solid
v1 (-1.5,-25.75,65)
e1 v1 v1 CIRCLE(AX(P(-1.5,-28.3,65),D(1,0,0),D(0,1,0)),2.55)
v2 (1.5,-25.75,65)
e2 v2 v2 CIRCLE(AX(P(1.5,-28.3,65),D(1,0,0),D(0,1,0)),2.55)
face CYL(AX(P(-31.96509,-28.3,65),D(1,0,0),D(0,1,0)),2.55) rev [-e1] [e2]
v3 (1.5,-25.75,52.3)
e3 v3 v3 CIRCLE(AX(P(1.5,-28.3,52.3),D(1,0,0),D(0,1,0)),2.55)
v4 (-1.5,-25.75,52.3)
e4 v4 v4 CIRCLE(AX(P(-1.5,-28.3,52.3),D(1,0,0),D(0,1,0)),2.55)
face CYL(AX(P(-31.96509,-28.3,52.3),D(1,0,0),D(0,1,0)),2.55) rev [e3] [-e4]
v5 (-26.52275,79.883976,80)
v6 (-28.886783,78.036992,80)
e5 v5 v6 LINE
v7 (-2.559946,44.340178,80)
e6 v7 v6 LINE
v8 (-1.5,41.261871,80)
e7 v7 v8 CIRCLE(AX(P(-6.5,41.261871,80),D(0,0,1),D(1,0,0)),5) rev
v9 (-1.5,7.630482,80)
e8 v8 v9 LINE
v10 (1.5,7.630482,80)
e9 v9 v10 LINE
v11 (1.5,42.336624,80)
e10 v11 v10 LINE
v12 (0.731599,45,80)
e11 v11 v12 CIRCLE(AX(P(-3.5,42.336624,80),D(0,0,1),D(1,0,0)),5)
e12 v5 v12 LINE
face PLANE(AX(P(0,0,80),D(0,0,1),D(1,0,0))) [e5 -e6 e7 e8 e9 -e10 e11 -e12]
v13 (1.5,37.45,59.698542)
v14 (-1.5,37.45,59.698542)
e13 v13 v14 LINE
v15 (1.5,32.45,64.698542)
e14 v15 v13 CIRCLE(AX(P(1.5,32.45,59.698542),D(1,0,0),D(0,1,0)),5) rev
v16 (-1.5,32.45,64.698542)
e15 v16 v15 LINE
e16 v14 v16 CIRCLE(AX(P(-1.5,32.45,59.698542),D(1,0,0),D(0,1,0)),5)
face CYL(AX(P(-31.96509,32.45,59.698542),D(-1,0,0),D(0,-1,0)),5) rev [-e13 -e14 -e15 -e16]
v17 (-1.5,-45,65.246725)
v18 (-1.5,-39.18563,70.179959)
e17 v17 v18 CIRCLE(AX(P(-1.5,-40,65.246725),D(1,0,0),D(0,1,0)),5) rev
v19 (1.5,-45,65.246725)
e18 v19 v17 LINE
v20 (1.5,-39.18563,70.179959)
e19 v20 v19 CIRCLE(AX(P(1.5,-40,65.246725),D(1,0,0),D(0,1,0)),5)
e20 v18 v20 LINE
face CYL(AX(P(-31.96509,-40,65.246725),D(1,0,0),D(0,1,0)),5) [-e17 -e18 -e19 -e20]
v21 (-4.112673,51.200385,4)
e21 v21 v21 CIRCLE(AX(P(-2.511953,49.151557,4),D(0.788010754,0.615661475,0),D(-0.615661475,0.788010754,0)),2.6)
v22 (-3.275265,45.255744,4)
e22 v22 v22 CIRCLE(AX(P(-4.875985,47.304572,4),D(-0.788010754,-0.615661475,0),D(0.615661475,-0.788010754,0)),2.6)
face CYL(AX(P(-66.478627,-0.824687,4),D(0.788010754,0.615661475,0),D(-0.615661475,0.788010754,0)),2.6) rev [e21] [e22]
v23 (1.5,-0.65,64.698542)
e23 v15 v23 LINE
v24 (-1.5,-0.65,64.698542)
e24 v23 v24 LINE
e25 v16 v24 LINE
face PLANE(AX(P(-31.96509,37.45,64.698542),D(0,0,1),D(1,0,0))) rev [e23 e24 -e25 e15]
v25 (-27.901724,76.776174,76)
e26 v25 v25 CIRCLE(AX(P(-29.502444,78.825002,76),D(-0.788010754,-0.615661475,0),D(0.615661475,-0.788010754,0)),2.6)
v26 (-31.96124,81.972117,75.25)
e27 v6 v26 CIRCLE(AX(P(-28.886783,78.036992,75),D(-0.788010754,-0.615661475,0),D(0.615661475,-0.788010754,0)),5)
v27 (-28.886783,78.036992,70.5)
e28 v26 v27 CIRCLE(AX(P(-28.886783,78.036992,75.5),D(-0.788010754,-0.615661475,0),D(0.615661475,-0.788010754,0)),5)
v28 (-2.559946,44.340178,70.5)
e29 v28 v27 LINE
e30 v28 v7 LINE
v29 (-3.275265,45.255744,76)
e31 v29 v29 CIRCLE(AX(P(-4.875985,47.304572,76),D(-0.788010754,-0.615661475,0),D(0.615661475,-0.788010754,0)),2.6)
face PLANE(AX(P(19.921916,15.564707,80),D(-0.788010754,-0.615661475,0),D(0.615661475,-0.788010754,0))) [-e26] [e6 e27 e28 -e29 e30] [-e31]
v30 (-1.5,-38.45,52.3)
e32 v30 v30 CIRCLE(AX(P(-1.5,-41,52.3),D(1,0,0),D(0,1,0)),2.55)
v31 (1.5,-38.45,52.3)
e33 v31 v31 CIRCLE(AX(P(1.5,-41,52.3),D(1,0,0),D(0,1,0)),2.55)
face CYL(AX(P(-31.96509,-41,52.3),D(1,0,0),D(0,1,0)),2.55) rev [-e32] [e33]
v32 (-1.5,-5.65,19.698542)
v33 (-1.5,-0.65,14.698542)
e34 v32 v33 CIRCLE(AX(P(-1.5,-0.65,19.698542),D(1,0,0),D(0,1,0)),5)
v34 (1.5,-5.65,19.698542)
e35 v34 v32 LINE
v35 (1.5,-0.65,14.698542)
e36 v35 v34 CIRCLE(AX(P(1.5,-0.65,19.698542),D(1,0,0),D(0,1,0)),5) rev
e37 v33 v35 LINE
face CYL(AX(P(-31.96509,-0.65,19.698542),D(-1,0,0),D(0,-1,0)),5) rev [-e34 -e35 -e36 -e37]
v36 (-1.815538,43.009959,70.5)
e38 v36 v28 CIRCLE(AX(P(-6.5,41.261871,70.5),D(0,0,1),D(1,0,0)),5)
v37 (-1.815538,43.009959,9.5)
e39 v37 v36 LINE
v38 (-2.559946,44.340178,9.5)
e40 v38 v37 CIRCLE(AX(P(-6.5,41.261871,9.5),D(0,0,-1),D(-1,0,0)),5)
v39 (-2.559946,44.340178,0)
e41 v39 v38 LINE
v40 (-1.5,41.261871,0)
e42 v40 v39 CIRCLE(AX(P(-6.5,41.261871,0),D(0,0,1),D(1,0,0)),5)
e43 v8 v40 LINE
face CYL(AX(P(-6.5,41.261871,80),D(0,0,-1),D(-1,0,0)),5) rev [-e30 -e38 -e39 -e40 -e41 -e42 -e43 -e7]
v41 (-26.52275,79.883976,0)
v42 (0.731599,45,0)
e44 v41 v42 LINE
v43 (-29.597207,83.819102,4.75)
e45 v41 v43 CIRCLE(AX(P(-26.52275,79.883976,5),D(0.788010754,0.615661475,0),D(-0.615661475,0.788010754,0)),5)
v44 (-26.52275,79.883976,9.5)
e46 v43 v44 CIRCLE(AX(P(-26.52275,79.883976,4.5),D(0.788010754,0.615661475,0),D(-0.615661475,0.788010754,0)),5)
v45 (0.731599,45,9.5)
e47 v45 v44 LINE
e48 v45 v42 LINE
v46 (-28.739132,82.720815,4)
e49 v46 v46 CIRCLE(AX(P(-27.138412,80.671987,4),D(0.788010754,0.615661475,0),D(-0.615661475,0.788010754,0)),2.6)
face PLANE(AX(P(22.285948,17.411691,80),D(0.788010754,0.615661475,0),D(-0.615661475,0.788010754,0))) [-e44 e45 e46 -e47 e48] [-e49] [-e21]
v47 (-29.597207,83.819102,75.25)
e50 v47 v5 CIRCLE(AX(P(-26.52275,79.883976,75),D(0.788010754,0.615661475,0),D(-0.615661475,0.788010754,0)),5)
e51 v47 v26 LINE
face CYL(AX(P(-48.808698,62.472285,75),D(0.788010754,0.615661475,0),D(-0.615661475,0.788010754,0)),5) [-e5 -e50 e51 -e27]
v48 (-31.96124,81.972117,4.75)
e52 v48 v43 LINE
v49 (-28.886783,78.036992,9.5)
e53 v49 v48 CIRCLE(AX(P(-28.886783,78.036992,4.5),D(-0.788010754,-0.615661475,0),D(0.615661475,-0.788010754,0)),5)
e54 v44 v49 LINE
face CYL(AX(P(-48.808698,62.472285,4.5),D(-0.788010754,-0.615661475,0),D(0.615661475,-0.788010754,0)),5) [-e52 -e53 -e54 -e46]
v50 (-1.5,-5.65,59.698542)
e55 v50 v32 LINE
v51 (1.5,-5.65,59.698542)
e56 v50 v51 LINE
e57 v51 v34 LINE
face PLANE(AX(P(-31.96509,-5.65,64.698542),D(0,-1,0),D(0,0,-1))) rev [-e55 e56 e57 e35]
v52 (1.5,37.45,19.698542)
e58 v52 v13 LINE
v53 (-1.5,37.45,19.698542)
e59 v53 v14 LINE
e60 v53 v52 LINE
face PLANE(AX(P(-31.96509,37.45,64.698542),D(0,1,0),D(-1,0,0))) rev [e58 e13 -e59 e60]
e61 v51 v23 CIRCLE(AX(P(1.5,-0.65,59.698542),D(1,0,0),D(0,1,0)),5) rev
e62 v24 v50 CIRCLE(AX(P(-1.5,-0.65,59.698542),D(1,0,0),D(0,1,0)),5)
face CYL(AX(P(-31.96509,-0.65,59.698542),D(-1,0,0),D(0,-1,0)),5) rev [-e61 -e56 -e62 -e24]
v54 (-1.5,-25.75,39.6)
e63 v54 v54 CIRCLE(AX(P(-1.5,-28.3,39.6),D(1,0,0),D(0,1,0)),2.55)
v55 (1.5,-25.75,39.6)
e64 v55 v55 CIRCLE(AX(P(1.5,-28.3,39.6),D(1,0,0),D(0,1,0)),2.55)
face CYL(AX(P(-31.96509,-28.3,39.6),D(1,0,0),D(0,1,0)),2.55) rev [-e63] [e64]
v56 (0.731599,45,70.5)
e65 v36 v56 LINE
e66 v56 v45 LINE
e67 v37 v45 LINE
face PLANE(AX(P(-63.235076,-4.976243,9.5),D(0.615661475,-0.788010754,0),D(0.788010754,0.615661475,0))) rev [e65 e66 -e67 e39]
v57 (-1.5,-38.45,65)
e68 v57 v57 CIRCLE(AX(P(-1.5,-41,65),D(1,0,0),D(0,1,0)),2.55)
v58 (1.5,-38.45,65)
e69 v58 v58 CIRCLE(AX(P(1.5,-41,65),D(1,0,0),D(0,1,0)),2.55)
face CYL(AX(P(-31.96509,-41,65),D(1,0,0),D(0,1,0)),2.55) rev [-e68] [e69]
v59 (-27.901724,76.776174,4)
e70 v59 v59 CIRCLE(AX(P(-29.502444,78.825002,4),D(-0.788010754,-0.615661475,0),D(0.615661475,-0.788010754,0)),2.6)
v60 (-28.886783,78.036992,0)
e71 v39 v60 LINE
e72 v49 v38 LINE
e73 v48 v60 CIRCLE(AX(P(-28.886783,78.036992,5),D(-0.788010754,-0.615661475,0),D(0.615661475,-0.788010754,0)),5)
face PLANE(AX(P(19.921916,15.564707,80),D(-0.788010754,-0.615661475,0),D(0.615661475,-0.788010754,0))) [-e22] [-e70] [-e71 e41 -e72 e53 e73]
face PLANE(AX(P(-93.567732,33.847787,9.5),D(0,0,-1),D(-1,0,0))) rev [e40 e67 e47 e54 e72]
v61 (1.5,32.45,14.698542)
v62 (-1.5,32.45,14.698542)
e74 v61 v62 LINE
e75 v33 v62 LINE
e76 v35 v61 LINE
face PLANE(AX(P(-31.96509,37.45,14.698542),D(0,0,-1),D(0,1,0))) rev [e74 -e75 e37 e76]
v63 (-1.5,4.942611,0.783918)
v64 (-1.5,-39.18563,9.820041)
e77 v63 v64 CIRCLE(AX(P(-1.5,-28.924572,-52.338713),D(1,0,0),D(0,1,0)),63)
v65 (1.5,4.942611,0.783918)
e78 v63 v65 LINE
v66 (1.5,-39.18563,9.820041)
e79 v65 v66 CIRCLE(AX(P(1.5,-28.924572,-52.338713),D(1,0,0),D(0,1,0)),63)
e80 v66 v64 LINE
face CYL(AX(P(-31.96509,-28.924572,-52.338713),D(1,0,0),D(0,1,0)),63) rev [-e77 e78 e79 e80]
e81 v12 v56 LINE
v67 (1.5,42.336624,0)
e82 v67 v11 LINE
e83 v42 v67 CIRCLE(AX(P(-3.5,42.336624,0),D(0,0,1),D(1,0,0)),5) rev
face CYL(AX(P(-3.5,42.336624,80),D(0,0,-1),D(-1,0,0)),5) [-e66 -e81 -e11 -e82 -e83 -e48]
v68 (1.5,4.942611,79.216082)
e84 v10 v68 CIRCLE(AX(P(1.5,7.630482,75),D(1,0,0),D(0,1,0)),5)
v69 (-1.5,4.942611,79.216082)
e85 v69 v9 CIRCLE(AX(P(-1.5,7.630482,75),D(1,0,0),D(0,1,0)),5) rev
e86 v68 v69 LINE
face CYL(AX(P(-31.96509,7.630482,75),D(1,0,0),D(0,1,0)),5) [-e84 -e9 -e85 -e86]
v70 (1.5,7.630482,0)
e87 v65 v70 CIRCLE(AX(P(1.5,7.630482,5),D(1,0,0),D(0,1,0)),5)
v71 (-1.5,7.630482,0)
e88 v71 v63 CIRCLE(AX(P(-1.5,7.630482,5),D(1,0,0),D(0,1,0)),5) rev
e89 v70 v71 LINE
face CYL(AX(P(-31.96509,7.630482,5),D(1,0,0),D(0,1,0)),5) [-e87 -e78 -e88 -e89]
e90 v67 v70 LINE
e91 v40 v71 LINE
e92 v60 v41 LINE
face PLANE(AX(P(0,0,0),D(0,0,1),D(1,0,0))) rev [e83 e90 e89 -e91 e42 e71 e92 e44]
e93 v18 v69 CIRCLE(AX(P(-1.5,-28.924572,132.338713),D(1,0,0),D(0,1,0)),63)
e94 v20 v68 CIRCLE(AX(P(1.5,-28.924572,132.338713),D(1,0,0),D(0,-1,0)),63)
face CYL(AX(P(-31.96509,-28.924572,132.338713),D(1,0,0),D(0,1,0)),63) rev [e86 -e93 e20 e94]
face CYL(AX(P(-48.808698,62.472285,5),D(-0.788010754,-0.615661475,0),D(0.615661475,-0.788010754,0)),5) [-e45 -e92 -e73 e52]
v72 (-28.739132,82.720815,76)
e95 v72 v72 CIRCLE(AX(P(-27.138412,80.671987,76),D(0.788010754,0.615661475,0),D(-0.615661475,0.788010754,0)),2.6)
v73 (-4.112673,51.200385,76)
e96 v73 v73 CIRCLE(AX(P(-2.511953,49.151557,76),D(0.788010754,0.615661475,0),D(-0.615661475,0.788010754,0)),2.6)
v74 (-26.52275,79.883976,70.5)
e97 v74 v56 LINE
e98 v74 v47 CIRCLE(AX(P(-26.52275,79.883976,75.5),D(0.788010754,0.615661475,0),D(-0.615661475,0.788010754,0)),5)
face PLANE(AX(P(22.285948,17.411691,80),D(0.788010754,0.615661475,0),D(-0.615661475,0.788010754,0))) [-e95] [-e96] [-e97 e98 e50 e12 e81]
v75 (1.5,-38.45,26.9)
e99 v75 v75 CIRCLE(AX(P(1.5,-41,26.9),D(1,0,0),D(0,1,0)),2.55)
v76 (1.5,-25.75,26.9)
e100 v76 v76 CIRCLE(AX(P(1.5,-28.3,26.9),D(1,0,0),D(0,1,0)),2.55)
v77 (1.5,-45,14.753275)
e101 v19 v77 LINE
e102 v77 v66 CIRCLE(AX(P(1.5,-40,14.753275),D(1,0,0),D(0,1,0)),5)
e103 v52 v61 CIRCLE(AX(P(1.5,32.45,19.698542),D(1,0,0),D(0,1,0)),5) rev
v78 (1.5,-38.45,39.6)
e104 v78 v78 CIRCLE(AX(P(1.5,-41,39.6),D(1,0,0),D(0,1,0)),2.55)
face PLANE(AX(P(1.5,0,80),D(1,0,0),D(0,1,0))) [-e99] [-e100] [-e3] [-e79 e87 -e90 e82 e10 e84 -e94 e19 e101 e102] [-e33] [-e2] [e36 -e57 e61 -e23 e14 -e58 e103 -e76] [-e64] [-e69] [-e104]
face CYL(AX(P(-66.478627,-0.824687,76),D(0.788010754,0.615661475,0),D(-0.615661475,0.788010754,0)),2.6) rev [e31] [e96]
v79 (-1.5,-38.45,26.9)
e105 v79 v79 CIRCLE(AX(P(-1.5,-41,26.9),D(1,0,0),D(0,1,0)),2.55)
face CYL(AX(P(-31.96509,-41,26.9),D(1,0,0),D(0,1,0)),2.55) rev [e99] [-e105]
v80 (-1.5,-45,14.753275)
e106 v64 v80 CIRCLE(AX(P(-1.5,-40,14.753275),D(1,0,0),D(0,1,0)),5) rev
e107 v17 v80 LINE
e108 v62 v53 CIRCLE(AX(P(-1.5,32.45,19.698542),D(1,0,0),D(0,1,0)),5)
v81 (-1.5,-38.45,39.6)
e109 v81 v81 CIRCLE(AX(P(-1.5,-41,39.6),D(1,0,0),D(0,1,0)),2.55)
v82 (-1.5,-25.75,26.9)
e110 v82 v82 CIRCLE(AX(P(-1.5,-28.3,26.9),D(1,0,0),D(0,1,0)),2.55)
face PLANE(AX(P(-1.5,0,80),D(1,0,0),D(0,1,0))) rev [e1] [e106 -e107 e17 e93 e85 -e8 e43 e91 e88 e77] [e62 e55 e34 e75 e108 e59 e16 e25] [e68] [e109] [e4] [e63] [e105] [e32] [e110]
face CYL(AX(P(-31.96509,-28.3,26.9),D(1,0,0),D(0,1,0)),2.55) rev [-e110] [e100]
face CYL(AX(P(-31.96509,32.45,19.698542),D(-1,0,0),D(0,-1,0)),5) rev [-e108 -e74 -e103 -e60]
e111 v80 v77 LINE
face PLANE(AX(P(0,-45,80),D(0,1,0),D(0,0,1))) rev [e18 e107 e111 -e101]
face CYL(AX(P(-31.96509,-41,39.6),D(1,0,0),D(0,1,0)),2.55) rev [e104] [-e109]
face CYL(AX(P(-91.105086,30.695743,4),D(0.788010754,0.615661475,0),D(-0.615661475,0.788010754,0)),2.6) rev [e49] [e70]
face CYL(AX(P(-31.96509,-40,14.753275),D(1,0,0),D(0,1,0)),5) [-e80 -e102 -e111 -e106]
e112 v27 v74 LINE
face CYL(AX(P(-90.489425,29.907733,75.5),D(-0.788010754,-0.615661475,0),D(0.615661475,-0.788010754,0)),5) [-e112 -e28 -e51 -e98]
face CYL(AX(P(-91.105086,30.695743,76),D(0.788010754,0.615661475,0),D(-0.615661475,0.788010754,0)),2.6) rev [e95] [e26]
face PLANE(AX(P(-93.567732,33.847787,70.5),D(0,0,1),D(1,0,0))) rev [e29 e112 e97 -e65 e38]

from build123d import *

# Parameters (mm, degrees)
SKETCH_1_W          = 3
SKETCH_1_H          = 90
EXTRUDE_1_DEPTH     = 80
SKETCH_2_R          = 2.6
CUT_EXTRUDE_1_DEPTH = 118.276484819
SKETCH_3_W          = 49.268401117
SKETCH_3_H          = 61
CUT_EXTRUDE_2_DEPTH = 118.276484819
SKETCH_4_R          = 2.55
CUT_EXTRUDE_3_DEPTH = 121.608375453
CUT_EXTRUDE_4_DEPTH = 121.608375453
FILLET_2_R          = 5
SKETCH_6_W          = 50
SKETCH_6_H          = 43.1
CUT_EXTRUDE_6_DEPTH = 121.608375453
FILLET_3_R          = 5


with BuildPart() as part:
    # 草图1 → 凸台-拉伸1 (new body)
    with BuildSketch(Plane.XY):
        Polygon((-1.18201613, 42.576507787), (-31.965089897, 81.977045467), (-29.601057636, 83.824029893), (1.18201613, 44.423492213), align=None)
        Rectangle(SKETCH_1_W, SKETCH_1_H)
    extrude(amount=EXTRUDE_1_DEPTH)

    # 草图2 → 切除-拉伸1 (cut, through all)
    with BuildSketch(Plane(origin=(22.285948177, 17.411690984, 0), x_dir=(0.6156614753256597, -0.788010753606721, 0), z_dir=(0.788010753606721, 0.6156614753256597, 0))):
        with Locations(Location((-80.278467782, -4, 0), (0, 0, 180))):
            Circle(SKETCH_2_R)
        with Locations(Location((-80.278467782, -76, 0), (0, 0, 180))):
            Circle(SKETCH_2_R)
        with Locations(Location((-40.278467782, -4, 0), (0, 0, 180))):
            Circle(SKETCH_2_R)
        with Locations(Location((-40.278467782, -76, 0), (0, 0, 180))):
            Circle(SKETCH_2_R)
    extrude(amount=-CUT_EXTRUDE_1_DEPTH, mode=Mode.SUBTRACT)

    # 草图3 → 切除-拉伸2 (cut, through all)
    with BuildSketch(Plane(origin=(22.285948177, 17.411690984, 0), x_dir=(0.6156614753256597, -0.788010753606721, 0), z_dir=(0.788010753606721, 0.6156614753256597, 0))):
        with Locations((-59.644267224, -40)):
            Rectangle(SKETCH_3_W, SKETCH_3_H)
    extrude(amount=-CUT_EXTRUDE_2_DEPTH, mode=Mode.SUBTRACT)

    # 草图4 → 切除-拉伸3 (cut, through all)
    with BuildSketch(Plane(origin=(1.5, 0, 0), x_dir=(0, 0, -1), z_dir=(1, 0, 0))):
        with Locations(Location((-65, -28.3, 0), (0, 0, 90))):
            Circle(SKETCH_4_R)
        with Locations(Location((-65, -41, 0), (0, 0, 90))):
            Circle(SKETCH_4_R)
        with Locations(Location((-52.3, -28.3, 0), (0, 0, 90))):
            Circle(SKETCH_4_R)
        with Locations(Location((-52.3, -41, 0), (0, 0, 90))):
            Circle(SKETCH_4_R)
        with Locations(Location((-39.6, -28.3, 0), (0, 0, 90))):
            Circle(SKETCH_4_R)
        with Locations(Location((-39.6, -41, 0), (0, 0, 90))):
            Circle(SKETCH_4_R)
        with Locations(Location((-26.9, -28.3, 0), (0, 0, 90))):
            Circle(SKETCH_4_R)
        with Locations(Location((-26.9, -41, 0), (0, 0, 90))):
            Circle(SKETCH_4_R)
    extrude(amount=-CUT_EXTRUDE_3_DEPTH, mode=Mode.SUBTRACT)

    # 草图5 → 切除-拉伸4 (cut, through all)
    with BuildSketch(Plane(origin=(1.5, 0, 0), x_dir=(0, 0, -1), z_dir=(1, 0, 0))):
        with BuildLine():
            Line((-80, 6.141923624), (-80, -45))
            Line((-80, -45), (-71.424177932, -45))
            ThreePointArc((-71.424177932, -45), (-70.206204317, -18.505774381), (-80, 6.141923624))
        make_face()
        with BuildLine():
            Line((0, -45), (-8.575822068, -45))
            ThreePointArc((-8.575822068, -45), (-9.793795683, -18.505774381), (0, 6.141923624))
            Line((0, 6.141923624), (0, -45))
        make_face()
    extrude(amount=-CUT_EXTRUDE_4_DEPTH, mode=Mode.SUBTRACT)

    # 圆角2
    # the kernel refuses this fillet: 5 mm, written as the material it adds along each edge
    with BuildSketch(Plane(origin=(-1.5, 42.98350858, 80), x_dir=(-0.61566147532566, 0.7880107536067206, 0), z_dir=(0, 0, -1))) as fillet_2_piece_1_section:
        with BuildLine():
            CenterArc((FILLET_2_R * 0.34432761329, -FILLET_2_R), FILLET_2_R, 90, 38)
            Line((-FILLET_2_R * 0.271333862036, -FILLET_2_R * 0.211989246393), (0, 0))
            Line((0, 0), (FILLET_2_R * 0.34432761329, 0))
        make_face()
    fillet_2_piece_1 = extrude(amount=84.304095166, mode=Mode.PRIVATE)
    fillet_2_piece_1 = split(fillet_2_piece_1, bisect_by=Plane(origin=(-1.5, 42.98350858, 70.5), z_dir=(0, 0, 1)), keep=Keep.TOP, mode=Mode.PRIVATE)
    add(fillet_2_piece_1)
    with BuildSketch(Plane(origin=(-1.5, 42.98350858, 84.304095166), x_dir=(-0.61566147532566, 0.7880107536067206, 0), z_dir=(0, 0, -1))) as fillet_2_piece_2_section:
        with BuildLine():
            CenterArc((FILLET_2_R * 0.34432761329, -FILLET_2_R), FILLET_2_R, 90, 38)
            Line((-FILLET_2_R * 0.271333862036, -FILLET_2_R * 0.211989246393), (0, 0))
            Line((0, 0), (FILLET_2_R * 0.34432761329, 0))
        make_face()
    fillet_2_piece_2 = extrude(amount=84.304095166, mode=Mode.PRIVATE)
    fillet_2_piece_2 = split(fillet_2_piece_2, bisect_by=Plane(origin=(-1.632433378, 43.153015574, 84.304095166), z_dir=(0.6156614753256597, -0.7880107536067209, 0)), keep=Keep.TOP, mode=Mode.PRIVATE)
    fillet_2_piece_2 = split(fillet_2_piece_2, bisect_by=Plane(origin=(-1.5, 42.98350858, 70.5), z_dir=(0, 0, -1)), keep=Keep.TOP, mode=Mode.PRIVATE)
    add(fillet_2_piece_2)
    with BuildSketch(Plane(origin=(-1.5, 42.98350858, 84.304095166), x_dir=(-0.61566147532566, 0.7880107536067206, 0), z_dir=(0, 0, -1))) as fillet_2_piece_3_section:
        with BuildLine():
            CenterArc((FILLET_2_R * 0.34432761329, -FILLET_2_R), FILLET_2_R, 90, 38)
            Line((-FILLET_2_R * 0.271333862036, -FILLET_2_R * 0.211989246393), (0, 0))
            Line((0, 0), (FILLET_2_R * 0.34432761329, 0))
        make_face()
    fillet_2_piece_3 = extrude(amount=84.304095166, mode=Mode.PRIVATE)
    fillet_2_piece_3 = split(fillet_2_piece_3, bisect_by=Plane(origin=(-1.5, 42.98350858, 9.5), z_dir=(0, 0, -1)), keep=Keep.TOP, mode=Mode.PRIVATE)
    add(fillet_2_piece_3)
    # the kernel refuses this fillet: 5 mm, written as the material it takes off along each edge
    with BuildSketch(Plane(origin=(1.5, 45, -6.658439614), x_dir=(0, -1, 0), z_dir=(0, 0, 1))) as fillet_2_2_piece_1:
        with BuildLine():
            CenterArc((2.663375846, -5), FILLET_2_R, 90, 32.186384057)
            Line((0, -0.768401117), (0, 0))
            Line((0, 0), (2.663375846, 0))
        make_face()
    extrude(amount=93.316879228, mode=Mode.SUBTRACT)

    # 草图6 → 切除-拉伸6 (cut, through all)
    with BuildSketch(Plane(origin=(1.5, 0, 0), x_dir=(0, 0, -1), z_dir=(1, 0, 0))):
        with Locations((-39.698542008, 15.9)):
            Rectangle(SKETCH_6_W, SKETCH_6_H)
    extrude(amount=-CUT_EXTRUDE_6_DEPTH, mode=Mode.SUBTRACT)

    # 圆角3
    # the kernel refuses this fillet: 5 mm, written as the material it adds along each edge
    with BuildSketch(Plane(origin=(1.5, -5.65, 14.698542008), x_dir=(0, 1, 0), z_dir=(-1, 0, 0)), Plane(origin=(1.5, -5.65, 64.698542008), x_dir=(0, 0, -1), z_dir=(-1, 0, 0)), Plane(origin=(1.5, 37.45, 64.698542008), x_dir=(0, -1, 0), z_dir=(-1, 0, 0))) as fillet_3_piece_1:
        with BuildLine():
            CenterArc((FILLET_3_R, -FILLET_3_R), FILLET_3_R, 90, 90)
            Line((0, -FILLET_3_R), (0, 0))
            Line((0, 0), (FILLET_3_R, 0))
        make_face()
    extrude(amount=3)
    with BuildSketch(Plane(origin=(1.5, 37.45, 14.698542008), x_dir=(0, -1, 0), z_dir=(-1, 0, 0))) as fillet_3_piece_2:
        with BuildLine():
            CenterArc((FILLET_3_R, FILLET_3_R), FILLET_3_R, 180, 90)
            Line((0, FILLET_3_R), (0, 0))
            Line((0, 0), (FILLET_3_R, 0))
        make_face()
    extrude(amount=3)
    # the kernel refuses this fillet: 5 mm, written as the material it takes off along each edge
    with BuildSketch(Plane(origin=(-41.815224317, 74.281277026, 0), x_dir=(0.6156614753256596, -0.7880107536067208, 0), z_dir=(0.7880107536067208, 0.6156614753256597, 0)), Plane(origin=(-19.750923216, 91.519798335, 9.5), x_dir=(0.6156614753256597, -0.7880107536067208, 1.0658141036401496e-15), z_dir=(-0.7880107536067209, -0.6156614753256597, 0))) as fillet_3_2_piece_1:
        with BuildLine():
            CenterArc((FILLET_3_R, -FILLET_3_R), FILLET_3_R, 90, 90)
            Line((0, -FILLET_3_R), (0, 0))
            Line((0, 0), (FILLET_3_R, 0))
        make_face()
    extrude(amount=28, mode=Mode.SUBTRACT)
    with BuildSketch(Plane(origin=(-41.815224317, 74.281277026, 80), x_dir=(0.6156614753256597, -0.7880107536067208, 0), z_dir=(0.7880107536067208, 0.6156614753256597, 0)), Plane(origin=(-19.750923216, 91.519798335, 70.5), x_dir=(0.6156614753256597, -0.7880107536067208, 0), z_dir=(-0.7880107536067209, -0.6156614753256597, 0))) as fillet_3_2_piece_2:
        with BuildLine():
            CenterArc((FILLET_3_R, FILLET_3_R), FILLET_3_R, 180, 90)
            Line((0, FILLET_3_R), (0, 0))
            Line((0, 0), (FILLET_3_R, 0))
        make_face()
    extrude(amount=28, mode=Mode.SUBTRACT)
    with BuildSketch(Plane(origin=(5.221396316, 6.141923624, 0), x_dir=(0, 1, 0), z_dir=(-1, 0, 0))) as fillet_3_2_piece_3:
        with BuildLine():
            CenterArc((1.488558526, -5), FILLET_3_R, 90, 32.518664638)
            ThreePointArc((-1.199313086, -0.783918147), (-0.597427923, -0.395368629), (0, 0))
            Line((0, 0), (1.488558526, 0))
        make_face()
    extrude(amount=10.442792632, mode=Mode.SUBTRACT)
    with BuildSketch(Plane(origin=(5.221396316, 6.141923624, 80), x_dir=(0, 1, 0), z_dir=(-1, 0, 0))) as fillet_3_2_piece_4:
        with BuildLine():
            CenterArc((1.488558526, 5), FILLET_3_R, 237.481335362, 32.518664638)
            ThreePointArc((-1.199313086, 0.783918147), (-0.597427923, 0.395368629), (0, 0))
            Line((0, 0), (1.488558526, 0))
        make_face()
    extrude(amount=10.442792632, mode=Mode.SUBTRACT)
    with BuildSketch(Plane(origin=(16.943632487, -45, 71.424177932), x_dir=(0, 0, -1), z_dir=(-1, 0, 0))) as fillet_3_2_piece_5:
        with BuildLine():
            CenterArc((6.177452995, -5), FILLET_3_R, 90, 99.373749783)
            ThreePointArc((1.244218563, -5.814369722), (0.69074329, -2.892497851), (0, 0))
            Line((0, 0), (6.177452995, 0))
        make_face()
    extrude(amount=33.887264974, mode=Mode.SUBTRACT)
    with BuildSketch(Plane(origin=(16.943632487, -45, 8.575822068), x_dir=(0, 0.9778615645016191, 0.20925286299223153), z_dir=(-1, 0, 0))) as fillet_3_2_piece_6:
        with BuildLine():
            CenterArc((6.181957548, -4.994429535), FILLET_3_R, 92.704821928, 99.373749783)
            Line((1.292649725, -6.04069385), (0, 0))
            ThreePointArc((0, 0), (2.973002485, -0.070187858), (5.946004969, 0))
        make_face()
    extrude(amount=33.887264974, mode=Mode.SUBTRACT)


solid = part.part
